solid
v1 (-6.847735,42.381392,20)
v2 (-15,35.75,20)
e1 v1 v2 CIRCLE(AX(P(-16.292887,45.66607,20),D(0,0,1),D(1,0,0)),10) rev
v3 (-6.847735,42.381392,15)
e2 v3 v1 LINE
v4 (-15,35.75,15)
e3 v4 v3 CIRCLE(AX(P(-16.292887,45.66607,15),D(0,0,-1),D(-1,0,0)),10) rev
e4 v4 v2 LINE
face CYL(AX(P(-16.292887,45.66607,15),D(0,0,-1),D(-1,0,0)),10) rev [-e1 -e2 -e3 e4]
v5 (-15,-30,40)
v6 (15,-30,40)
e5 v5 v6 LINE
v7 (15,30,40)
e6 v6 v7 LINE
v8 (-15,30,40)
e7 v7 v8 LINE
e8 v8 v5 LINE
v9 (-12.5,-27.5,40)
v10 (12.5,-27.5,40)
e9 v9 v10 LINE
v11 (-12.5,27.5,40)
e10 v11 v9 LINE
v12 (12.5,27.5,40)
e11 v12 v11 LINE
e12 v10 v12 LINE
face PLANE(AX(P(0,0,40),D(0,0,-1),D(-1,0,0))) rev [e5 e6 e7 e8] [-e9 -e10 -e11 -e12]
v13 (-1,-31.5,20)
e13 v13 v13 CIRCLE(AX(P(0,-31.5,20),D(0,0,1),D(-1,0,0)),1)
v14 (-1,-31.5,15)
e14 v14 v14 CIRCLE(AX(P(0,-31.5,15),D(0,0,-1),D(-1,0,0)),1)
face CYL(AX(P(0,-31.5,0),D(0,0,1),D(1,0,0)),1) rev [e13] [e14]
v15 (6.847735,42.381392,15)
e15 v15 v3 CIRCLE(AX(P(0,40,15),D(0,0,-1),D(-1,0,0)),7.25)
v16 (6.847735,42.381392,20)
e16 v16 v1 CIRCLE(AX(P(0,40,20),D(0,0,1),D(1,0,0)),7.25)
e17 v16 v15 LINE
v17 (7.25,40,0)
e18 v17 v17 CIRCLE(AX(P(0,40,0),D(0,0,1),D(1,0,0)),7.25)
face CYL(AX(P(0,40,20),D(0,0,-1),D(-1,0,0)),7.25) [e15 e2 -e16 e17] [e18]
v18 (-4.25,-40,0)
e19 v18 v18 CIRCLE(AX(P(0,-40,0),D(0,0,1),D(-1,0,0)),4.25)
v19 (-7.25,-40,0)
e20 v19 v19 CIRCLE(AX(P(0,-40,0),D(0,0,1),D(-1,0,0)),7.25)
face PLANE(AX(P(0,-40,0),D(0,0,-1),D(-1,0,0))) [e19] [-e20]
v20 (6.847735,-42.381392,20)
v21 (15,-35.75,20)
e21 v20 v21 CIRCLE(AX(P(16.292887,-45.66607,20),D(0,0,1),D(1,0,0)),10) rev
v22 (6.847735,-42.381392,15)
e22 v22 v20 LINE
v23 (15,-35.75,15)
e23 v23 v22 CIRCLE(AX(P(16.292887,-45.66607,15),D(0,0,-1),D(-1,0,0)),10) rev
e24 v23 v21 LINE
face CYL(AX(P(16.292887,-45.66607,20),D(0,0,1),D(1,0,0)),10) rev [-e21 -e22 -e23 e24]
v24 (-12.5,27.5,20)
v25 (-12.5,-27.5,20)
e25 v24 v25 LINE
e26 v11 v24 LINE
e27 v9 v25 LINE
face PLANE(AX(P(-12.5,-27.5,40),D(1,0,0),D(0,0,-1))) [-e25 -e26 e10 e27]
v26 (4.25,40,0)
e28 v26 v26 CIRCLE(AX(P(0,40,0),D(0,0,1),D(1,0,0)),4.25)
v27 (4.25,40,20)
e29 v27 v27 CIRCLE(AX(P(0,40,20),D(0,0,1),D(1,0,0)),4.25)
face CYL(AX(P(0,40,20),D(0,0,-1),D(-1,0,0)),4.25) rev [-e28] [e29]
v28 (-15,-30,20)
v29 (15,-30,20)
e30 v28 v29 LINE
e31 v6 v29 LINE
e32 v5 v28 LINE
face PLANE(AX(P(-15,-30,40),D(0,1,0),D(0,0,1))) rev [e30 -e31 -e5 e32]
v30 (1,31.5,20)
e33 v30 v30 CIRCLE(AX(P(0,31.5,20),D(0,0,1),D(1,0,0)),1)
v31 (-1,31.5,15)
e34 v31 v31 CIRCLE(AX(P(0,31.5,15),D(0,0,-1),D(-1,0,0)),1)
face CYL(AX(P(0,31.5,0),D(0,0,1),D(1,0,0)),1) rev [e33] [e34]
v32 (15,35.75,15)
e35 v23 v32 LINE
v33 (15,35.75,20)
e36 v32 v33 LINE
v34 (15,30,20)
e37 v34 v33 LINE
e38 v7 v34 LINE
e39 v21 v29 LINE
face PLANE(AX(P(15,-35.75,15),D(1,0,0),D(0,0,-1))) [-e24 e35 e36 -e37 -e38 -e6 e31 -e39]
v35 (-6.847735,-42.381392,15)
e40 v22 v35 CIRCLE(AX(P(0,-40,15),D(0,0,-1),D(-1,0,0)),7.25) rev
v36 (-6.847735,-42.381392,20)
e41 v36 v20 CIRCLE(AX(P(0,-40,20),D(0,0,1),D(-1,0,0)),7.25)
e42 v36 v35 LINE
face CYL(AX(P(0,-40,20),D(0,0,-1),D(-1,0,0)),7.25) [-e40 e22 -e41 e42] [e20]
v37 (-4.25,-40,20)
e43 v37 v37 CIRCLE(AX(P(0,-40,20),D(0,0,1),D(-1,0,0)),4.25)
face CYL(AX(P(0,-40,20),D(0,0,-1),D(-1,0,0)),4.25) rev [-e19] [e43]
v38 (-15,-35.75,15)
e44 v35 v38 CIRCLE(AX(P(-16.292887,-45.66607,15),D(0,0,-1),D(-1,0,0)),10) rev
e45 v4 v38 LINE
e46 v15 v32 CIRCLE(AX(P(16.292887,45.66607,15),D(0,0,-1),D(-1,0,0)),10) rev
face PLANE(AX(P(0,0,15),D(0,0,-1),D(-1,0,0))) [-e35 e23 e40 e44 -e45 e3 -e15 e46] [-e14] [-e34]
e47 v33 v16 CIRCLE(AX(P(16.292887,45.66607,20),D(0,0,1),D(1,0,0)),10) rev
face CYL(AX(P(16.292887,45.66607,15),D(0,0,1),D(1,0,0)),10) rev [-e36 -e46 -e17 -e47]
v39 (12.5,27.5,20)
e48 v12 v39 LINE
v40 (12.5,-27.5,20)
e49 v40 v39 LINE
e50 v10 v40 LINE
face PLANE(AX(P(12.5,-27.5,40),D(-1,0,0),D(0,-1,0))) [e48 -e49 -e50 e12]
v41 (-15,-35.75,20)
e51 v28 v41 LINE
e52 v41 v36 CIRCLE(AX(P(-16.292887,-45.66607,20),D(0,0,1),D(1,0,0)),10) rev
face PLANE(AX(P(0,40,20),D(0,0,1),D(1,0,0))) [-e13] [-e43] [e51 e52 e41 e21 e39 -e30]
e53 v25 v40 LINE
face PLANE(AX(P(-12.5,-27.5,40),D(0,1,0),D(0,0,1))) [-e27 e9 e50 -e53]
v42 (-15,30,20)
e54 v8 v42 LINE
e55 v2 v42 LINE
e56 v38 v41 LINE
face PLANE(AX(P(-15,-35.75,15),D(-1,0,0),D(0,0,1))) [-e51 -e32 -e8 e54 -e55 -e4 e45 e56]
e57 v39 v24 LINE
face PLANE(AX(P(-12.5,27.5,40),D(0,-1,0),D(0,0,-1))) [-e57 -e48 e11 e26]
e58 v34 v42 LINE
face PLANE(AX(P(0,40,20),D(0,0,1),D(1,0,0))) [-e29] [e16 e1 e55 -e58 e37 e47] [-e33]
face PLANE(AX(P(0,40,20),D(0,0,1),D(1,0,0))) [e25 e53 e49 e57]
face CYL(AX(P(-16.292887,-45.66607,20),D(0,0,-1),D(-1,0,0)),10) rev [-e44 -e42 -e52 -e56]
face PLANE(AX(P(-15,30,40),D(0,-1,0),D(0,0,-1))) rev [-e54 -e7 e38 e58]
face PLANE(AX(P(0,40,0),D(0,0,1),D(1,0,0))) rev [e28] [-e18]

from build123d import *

# Parameters (mm, degrees)
ESBO_O1_R                  = 7.25
ESBO_O1_R_2                = 4.25
RESSALTO_EXTRUS_O1_DEPTH   = 20
RESSALTO_EXTRUS_O1_2_DEPTH = 20
ESBO_O2_W                  = 30
ESBO_O2_H                  = 71.5
RESSALTO_EXTRUS_O2_DEPTH   = 5
FILETE1_R                  = 10
ESBO_O3_W                  = 30
ESBO_O3_H                  = 60
ESBO_O3_W_2                = 25
ESBO_O3_H_2                = 55
RESSALTO_EXTRUS_O3_DEPTH   = 20
ESBO_O4_R                  = 1
CORTE_EXTRUS_O1_DEPTH      = 54.456173638


with BuildPart() as part:
    # Esboço1 → Ressalto-extrusão1 (new body)
    with BuildSketch(Plane.XY):
        with Locations((0, 40)):
            Circle(ESBO_O1_R)
        with Locations((0, 40)):
            Circle(ESBO_O1_R_2, mode=Mode.SUBTRACT)
    extrude(amount=RESSALTO_EXTRUS_O1_DEPTH)



with BuildPart() as body_2:
    # Esboço1 → Ressalto-extrus_o1 2 (new body)
    with BuildSketch(Plane.XY):
        with Locations(Location((0, -40, 0), (0, 0, 180))):
            Circle(ESBO_O1_R)
        with Locations(Location((0, -40, 0), (0, 0, 180))):
            Circle(ESBO_O1_R_2, mode=Mode.SUBTRACT)
    extrude(amount=RESSALTO_EXTRUS_O1_2_DEPTH)


with BuildPart() as part_1:
    add(part.part)

    add(body_2.part)  # Ressalto-extrusão2 merges body 2
    # Esboço2 → Ressalto-extrusão2 (add)
    with BuildSketch(Plane.XY.offset(20)):
        Rectangle(ESBO_O2_W, ESBO_O2_H)
    extrude(amount=-RESSALTO_EXTRUS_O2_DEPTH)

    # Filete1
    # the kernel refuses this fillet: 10 mm, written as the material it adds along each edge
    with BuildSketch(Plane(origin=(-5.873670062, -35.75, 20), x_dir=(-1, 0, 0), z_dir=(0, 0, -1))) as filete1_piece_1:
        with BuildLine():
            CenterArc((10.419216441, -9.916070012), FILETE1_R, 97.428488086, 63.395706738)
            Line((0.974064845, -6.631391744), (0.785161813, -6.565698179))
            ThreePointArc((0.785161813, -6.565698179), (1.101484321, -3.225440913), (-0.162032278, -0.117241379))
            Line((-0.162032278, -0.117241379), (0, 0.2))
            ThreePointArc((0, 0.2), (4.563164969, 0.2), (9.100472208, 0.1983214))
            Line((9.100472208, 0.1983214), (9.126329938, 0))
        make_face()
    extrude(amount=5)
    with BuildSketch(Plane(origin=(5.873670062, -35.75, 20), x_dir=(1, 0, 0), z_dir=(0, 0, -1))) as filete1_piece_2:
        with BuildLine():
            CenterArc((10.419216441, 9.916070012), FILETE1_R, 199.175805176, 63.395706738)
            Line((0.974064845, 6.631391744), (0.785161813, 6.565698179))
            ThreePointArc((0.785161813, 6.565698179), (1.101484321, 3.225440913), (-0.162032278, 0.117241379))
            Line((-0.162032278, 0.117241379), (0, -0.2))
            ThreePointArc((0, -0.2), (4.563164969, -0.2), (9.100472208, -0.1983214))
            Line((9.100472208, -0.1983214), (9.126329938, 0))
        make_face()
    extrude(amount=5)
    with BuildSketch(Plane(origin=(5.873670062, 35.75, 20), x_dir=(0.14532753012910826, 0.9893836005243736, 0), z_dir=(0, 0, -1))) as filete1_piece_3:
        with BuildLine():
            CenterArc((11.324996043, 8.867523914), FILETE1_R, 179.072241898, 63.395706738)
            Line((1.326306989, 9.029441173), (1.126333208, 9.032679519))
            ThreePointArc((1.126333208, 9.032679519), (0.465276774, 4.543786093), (-0.19787672, 0.029065506))
            Line((-0.19787672, 0.029065506), (0.092448947, -0.177350478))
            ThreePointArc((0.092448947, -0.177350478), (3.351274339, 0.621045162), (6.610099731, -0.177350478))
            Line((6.610099731, -0.177350478), (6.702548679, 0))
        make_face()
    extrude(amount=5)
    with BuildSketch(Plane(origin=(-5.873670062, 35.75, 20), x_dir=(-0.14532753012910826, 0.9893836005243736, 0), z_dir=(0, 0, -1))) as filete1_piece_4:
        with BuildLine():
            CenterArc((11.324996043, -8.867523914), FILETE1_R, 117.532051364, 63.395706738)
            Line((1.326306989, -9.029441173), (1.126333208, -9.032679519))
            ThreePointArc((1.126333208, -9.032679519), (0.465276774, -4.543786093), (-0.19787672, -0.029065506))
            Line((-0.19787672, -0.029065506), (0.092448947, 0.177350478))
            ThreePointArc((0.092448947, 0.177350478), (3.351274339, -0.621045162), (6.610099731, 0.177350478))
            Line((6.610099731, 0.177350478), (6.702548679, 0))
        make_face()
    extrude(amount=5)

    # Esboço3 → Ressalto-extrusão3 (add)
    with BuildSketch(Plane.XY.offset(20)):
        Rectangle(ESBO_O3_W, ESBO_O3_H)
        Rectangle(ESBO_O3_W_2, ESBO_O3_H_2, mode=Mode.SUBTRACT)
    extrude(amount=RESSALTO_EXTRUS_O3_DEPTH)

    # Esboço4 → Corte-extrusão1 (cut, through all)
    with BuildSketch(Plane.XY.offset(20)):
        with Locations((0, 31.5)):
            Circle(ESBO_O4_R)
        with Locations(Location((0, -31.5, 0), (0, 0, 180))):
            Circle(ESBO_O4_R)
    extrude(amount=-CORTE_EXTRUS_O1_DEPTH, mode=Mode.SUBTRACT)


solid = part_1.part
